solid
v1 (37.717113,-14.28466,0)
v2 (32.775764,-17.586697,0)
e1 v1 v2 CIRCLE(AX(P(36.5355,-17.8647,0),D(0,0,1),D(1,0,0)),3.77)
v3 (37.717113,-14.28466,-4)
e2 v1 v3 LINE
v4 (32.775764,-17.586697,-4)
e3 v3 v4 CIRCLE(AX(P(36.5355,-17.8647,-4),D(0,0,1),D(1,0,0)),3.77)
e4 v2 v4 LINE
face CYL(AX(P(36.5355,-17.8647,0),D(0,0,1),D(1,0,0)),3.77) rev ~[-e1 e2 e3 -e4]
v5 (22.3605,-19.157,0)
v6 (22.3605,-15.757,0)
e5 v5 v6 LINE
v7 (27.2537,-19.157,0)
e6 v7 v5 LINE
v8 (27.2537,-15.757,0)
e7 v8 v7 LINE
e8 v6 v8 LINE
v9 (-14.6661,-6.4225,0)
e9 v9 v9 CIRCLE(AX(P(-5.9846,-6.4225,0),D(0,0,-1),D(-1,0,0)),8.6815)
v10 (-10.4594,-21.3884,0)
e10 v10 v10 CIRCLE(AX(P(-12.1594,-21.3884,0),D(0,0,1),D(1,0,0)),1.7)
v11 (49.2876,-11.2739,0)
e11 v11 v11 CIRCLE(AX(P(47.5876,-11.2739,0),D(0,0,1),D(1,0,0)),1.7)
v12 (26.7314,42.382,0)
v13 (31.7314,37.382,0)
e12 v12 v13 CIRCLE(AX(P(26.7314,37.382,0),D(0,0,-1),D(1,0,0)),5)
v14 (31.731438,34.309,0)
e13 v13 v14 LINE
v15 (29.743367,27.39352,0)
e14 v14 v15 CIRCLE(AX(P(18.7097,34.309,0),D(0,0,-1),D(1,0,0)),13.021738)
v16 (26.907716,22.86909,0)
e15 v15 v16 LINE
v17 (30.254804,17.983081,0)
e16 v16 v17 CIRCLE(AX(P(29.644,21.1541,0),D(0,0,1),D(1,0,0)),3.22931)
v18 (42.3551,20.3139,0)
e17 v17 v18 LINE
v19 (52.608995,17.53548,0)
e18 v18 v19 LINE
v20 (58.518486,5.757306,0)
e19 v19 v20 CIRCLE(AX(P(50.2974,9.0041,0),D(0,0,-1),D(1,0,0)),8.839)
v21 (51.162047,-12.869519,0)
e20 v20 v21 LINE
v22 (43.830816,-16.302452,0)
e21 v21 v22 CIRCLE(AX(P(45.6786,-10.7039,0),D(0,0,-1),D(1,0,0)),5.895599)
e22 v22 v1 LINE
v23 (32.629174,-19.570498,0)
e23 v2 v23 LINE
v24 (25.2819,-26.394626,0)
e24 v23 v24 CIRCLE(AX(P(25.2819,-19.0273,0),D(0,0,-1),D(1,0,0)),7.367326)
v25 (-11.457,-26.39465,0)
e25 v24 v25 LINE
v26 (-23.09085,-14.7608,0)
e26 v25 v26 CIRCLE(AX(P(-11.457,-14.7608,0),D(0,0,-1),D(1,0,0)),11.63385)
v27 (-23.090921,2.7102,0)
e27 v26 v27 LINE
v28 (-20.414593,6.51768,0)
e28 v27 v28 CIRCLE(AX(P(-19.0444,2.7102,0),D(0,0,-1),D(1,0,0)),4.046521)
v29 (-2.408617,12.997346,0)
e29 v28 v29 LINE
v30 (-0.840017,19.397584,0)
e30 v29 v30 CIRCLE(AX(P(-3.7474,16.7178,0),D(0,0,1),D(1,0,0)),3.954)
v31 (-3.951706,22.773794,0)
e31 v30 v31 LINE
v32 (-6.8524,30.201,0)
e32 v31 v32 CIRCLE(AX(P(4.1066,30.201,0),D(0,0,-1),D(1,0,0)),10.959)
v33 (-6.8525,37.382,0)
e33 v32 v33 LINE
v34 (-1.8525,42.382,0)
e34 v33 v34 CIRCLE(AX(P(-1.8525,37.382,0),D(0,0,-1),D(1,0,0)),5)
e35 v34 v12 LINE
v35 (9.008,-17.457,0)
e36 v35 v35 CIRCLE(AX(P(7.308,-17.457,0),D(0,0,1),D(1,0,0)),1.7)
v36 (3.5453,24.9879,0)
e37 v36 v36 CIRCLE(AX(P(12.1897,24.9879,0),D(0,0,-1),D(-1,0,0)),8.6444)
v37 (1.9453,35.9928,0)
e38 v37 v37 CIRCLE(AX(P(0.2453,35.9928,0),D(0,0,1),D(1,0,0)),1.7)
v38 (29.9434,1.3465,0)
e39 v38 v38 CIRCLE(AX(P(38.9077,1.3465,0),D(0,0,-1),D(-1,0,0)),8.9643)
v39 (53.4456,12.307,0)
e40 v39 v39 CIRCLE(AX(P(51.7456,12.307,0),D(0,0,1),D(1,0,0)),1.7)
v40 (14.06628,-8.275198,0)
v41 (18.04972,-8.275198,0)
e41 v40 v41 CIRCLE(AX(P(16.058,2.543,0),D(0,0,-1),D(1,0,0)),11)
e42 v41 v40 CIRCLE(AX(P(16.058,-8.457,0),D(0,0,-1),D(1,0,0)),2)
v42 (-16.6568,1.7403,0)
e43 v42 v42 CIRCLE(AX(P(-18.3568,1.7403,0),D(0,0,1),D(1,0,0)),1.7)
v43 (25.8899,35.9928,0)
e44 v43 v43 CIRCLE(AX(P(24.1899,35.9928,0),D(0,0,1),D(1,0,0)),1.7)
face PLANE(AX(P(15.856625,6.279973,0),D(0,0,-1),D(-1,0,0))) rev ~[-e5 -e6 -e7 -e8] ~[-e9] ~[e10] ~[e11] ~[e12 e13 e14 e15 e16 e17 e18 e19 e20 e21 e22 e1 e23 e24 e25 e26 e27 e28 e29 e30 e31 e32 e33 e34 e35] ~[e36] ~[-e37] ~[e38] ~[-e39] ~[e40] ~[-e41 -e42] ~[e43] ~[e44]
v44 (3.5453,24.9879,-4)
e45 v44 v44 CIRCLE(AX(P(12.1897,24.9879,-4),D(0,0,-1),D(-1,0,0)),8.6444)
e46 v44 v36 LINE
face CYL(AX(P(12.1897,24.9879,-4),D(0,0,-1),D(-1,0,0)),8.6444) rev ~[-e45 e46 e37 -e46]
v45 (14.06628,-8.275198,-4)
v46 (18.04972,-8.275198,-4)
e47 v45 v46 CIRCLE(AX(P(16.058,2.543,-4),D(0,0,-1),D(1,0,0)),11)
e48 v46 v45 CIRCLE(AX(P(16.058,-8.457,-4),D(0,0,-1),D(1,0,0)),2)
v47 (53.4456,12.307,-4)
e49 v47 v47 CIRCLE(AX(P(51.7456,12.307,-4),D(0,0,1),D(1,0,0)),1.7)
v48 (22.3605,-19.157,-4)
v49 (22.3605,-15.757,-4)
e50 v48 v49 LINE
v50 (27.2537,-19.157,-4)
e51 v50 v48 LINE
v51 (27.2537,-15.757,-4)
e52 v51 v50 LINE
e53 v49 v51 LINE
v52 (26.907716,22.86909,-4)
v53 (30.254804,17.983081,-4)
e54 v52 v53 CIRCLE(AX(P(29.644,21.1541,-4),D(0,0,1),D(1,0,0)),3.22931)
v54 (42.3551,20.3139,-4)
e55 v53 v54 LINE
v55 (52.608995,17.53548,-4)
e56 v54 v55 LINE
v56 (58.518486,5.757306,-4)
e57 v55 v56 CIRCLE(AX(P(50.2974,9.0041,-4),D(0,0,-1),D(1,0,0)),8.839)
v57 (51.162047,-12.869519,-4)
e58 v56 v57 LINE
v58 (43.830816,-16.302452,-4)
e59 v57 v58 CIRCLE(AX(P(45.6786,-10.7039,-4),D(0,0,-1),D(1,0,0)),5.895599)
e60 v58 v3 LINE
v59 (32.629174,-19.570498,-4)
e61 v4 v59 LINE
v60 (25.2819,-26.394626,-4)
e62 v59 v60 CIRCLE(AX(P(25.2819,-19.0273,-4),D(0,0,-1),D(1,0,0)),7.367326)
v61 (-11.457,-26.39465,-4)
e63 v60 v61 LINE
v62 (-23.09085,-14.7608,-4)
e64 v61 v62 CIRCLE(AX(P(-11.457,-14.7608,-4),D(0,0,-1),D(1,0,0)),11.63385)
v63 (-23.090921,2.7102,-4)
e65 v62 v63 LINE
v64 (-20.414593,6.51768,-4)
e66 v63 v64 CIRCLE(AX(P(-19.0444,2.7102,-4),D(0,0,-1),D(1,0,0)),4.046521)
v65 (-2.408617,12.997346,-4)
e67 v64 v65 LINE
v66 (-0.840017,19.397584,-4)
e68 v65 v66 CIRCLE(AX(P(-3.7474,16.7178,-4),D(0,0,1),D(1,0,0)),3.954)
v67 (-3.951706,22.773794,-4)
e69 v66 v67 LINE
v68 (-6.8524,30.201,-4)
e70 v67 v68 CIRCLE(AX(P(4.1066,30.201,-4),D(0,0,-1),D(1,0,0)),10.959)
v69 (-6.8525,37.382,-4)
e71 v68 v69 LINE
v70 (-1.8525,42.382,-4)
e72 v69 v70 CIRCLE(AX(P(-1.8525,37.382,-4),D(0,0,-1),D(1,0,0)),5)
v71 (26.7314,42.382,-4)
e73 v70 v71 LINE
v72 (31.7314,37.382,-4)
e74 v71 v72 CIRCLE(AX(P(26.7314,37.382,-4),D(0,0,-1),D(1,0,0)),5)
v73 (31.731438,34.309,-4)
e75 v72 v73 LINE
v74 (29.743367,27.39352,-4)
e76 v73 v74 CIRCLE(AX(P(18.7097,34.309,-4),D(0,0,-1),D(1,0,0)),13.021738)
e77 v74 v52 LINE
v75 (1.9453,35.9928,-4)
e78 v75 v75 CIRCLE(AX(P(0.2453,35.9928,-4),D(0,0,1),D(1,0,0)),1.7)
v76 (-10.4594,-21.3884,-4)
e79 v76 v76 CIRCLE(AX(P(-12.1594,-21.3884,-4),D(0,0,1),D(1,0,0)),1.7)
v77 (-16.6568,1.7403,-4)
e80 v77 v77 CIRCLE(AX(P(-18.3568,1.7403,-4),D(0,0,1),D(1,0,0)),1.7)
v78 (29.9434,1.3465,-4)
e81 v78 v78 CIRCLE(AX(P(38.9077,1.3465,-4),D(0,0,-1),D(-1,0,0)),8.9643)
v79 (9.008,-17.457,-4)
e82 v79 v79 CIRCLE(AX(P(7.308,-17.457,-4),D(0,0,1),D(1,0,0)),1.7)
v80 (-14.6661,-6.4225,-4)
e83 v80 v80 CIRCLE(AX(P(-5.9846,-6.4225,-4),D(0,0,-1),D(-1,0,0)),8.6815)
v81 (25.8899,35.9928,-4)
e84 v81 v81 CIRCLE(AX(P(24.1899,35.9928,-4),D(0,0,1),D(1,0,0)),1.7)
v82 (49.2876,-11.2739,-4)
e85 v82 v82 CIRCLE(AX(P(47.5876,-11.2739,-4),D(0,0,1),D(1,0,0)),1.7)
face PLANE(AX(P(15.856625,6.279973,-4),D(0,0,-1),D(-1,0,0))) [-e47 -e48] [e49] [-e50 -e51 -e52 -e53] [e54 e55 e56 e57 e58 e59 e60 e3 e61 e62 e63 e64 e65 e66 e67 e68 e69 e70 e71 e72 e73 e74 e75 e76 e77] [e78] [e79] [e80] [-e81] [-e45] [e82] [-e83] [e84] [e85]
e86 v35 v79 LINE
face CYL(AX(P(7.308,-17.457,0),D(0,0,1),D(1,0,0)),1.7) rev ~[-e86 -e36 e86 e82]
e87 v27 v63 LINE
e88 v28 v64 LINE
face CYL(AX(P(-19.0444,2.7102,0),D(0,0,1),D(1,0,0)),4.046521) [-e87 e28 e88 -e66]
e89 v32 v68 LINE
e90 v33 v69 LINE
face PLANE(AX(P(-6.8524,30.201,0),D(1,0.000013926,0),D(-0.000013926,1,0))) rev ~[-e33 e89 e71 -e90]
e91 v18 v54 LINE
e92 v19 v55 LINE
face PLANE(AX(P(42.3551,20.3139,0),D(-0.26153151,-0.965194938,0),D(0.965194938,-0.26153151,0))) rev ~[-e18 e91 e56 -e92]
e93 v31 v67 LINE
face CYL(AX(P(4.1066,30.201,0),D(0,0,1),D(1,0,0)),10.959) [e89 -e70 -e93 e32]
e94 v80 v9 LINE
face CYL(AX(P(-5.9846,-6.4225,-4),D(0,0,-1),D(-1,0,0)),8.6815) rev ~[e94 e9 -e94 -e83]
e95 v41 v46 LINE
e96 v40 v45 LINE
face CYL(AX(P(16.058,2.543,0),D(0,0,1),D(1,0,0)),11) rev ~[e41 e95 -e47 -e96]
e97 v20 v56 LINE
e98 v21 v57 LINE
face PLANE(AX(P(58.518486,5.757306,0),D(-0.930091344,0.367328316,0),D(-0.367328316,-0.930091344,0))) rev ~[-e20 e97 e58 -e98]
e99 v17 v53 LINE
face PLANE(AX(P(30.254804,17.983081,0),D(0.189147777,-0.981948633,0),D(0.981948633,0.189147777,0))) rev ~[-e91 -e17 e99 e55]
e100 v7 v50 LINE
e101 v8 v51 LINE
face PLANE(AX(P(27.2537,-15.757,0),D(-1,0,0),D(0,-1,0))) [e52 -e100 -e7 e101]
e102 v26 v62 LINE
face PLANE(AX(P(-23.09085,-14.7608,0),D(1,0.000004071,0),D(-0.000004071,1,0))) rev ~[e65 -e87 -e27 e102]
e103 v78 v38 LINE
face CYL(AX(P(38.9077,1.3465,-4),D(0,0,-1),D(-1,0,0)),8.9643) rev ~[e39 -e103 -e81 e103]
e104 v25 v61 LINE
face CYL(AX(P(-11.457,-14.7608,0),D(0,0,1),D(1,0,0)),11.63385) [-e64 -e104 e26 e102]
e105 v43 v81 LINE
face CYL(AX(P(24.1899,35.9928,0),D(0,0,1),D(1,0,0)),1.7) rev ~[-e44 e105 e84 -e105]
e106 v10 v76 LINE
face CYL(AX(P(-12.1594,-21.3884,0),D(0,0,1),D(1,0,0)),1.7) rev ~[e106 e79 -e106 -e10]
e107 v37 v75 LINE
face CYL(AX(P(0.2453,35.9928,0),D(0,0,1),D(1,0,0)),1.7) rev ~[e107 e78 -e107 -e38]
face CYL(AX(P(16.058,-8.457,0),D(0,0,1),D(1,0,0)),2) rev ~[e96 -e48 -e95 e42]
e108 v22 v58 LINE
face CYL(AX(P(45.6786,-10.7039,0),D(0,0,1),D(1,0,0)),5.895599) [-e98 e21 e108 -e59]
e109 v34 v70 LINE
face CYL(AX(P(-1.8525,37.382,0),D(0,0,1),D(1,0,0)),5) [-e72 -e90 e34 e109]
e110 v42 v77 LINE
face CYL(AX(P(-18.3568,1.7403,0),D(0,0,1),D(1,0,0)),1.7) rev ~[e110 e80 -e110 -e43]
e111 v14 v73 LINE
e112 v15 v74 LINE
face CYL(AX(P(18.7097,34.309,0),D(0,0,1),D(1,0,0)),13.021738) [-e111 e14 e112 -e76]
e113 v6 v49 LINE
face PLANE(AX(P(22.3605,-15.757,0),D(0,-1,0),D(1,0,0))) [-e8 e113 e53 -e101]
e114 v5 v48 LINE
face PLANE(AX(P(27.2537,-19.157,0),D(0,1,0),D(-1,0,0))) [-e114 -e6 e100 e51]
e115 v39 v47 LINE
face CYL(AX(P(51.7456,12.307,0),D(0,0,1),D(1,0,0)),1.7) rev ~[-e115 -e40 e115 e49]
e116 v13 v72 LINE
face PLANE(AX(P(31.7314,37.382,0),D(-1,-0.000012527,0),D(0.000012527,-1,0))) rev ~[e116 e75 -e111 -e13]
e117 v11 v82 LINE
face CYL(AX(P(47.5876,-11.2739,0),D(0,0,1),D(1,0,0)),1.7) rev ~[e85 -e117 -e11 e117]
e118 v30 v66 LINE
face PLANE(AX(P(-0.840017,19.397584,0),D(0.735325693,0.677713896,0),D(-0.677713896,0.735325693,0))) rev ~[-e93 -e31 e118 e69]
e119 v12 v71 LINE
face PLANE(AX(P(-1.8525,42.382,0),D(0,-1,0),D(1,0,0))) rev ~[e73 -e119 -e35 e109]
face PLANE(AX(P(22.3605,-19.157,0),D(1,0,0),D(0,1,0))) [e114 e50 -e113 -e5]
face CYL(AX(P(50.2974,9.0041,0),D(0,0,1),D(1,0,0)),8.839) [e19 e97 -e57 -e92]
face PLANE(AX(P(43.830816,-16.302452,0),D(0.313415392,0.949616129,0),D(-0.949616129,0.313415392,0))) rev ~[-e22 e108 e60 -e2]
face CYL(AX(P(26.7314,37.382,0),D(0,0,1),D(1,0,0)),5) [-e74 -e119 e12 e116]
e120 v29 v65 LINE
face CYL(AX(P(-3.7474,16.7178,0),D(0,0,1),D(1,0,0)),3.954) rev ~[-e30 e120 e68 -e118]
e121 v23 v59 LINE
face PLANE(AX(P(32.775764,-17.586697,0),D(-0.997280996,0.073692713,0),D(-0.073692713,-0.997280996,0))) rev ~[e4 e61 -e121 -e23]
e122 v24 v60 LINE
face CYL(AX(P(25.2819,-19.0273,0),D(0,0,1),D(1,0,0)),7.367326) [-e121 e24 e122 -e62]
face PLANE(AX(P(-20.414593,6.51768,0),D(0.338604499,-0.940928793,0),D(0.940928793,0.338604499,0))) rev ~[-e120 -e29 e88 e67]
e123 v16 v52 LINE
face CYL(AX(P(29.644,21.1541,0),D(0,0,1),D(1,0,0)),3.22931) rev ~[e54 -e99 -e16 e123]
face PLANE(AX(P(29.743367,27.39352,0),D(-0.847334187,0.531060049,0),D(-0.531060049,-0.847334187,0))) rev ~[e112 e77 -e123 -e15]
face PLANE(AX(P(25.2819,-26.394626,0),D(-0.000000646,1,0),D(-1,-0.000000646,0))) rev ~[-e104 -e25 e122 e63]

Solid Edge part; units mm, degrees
sketch "Sketch1" plane through (0, 0, 0) normal (0, 0, 1) x (1, 0, 0)
  arc A0 (-6.8525, 37.382) -> (-1.8525, 42.382) centre (-1.8525, 37.382) cw
  line L0 (-1.8525, 42.382) -> (26.7314, 42.382)
  arc A1 (26.7314, 42.382) -> (31.7314, 37.382) centre (26.7314, 37.382) cw
  line L1 (31.7314, 37.382) -> (31.7314, 34.309)
  arc A2 (31.7314, 34.309) -> (29.7434, 27.3935) centre (18.7097, 34.309) cw
  line L2 (29.7434, 27.3935) -> (26.9077, 22.8691)
  arc A3 (26.9077, 22.8691) -> (30.2548, 17.9831) centre (29.644, 21.1541) ccw
  line L3 (30.2548, 17.9831) -> (42.3551, 20.3139)
  line L4 (42.3551, 20.3139) -> (52.609, 17.5355)
  arc A4 (52.609, 17.5355) -> (58.5185, 5.7573) centre (50.2974, 9.0041) cw
  line L5 (58.5185, 5.7573) -> (51.162, -12.8695)
  arc A5 (51.162, -12.8695) -> (43.8308, -16.3025) centre (45.6786, -10.7039) cw
  line L6 (43.8308, -16.3025) -> (37.7171, -14.2847)
  arc A6 (37.7171, -14.2847) -> (32.7758, -17.5867) centre (36.5355, -17.8647) ccw
  line L7 (32.7758, -17.5867) -> (32.6292, -19.5705)
  arc A7 (32.6292, -19.5705) -> (25.2819, -26.3946) centre (25.2819, -19.0273) cw
  line L8 (25.2819, -26.3946) -> (-11.457, -26.3946)
  arc A8 (-11.457, -26.3946) -> (-23.0909, -14.7608) centre (-11.457, -14.7608) cw
  line L9 (-23.0909, -14.7608) -> (-23.0909, 2.7102)
  arc A9 (-23.0909, 2.7102) -> (-20.4146, 6.5177) centre (-19.0444, 2.7102) cw
  line L10 (-20.4146, 6.5177) -> (-2.4086, 12.9973)
  arc A10 (-2.4086, 12.9973) -> (-0.84, 19.3976) centre (-3.7474, 16.7178) ccw
  line L11 (-0.84, 19.3976) -> (-3.9517, 22.7738)
  arc A11 (-3.9517, 22.7738) -> (-6.8525, 30.201) centre (4.1066, 30.201) cw
  line L12 (-6.8525, 30.201) -> (-6.8525, 37.382)
  circle A12 centre (7.308, -17.457) radius 1.7
  arc A13 (18.0497, -8.2752) -> (14.0663, -8.2752) centre (16.058, -8.457) cw
  arc A14 (14.0663, -8.2752) -> (18.0497, -8.2752) centre (16.058, 2.543) cw
  circle A15 centre (24.1899, 35.9928) radius 1.7
  circle A16 centre (0.2453, 35.9928) radius 1.7
  line L13 (27.2537, -19.157) -> (22.3605, -19.157)
  line L14 (27.2537, -15.757) -> (27.2537, -19.157)
  line L15 (22.3605, -15.757) -> (27.2537, -15.757)
  line L16 (22.3605, -19.157) -> (22.3605, -15.757)
  circle A17 centre (-18.3568, 1.7403) radius 1.7
  circle A18 centre (-12.1594, -21.3884) radius 1.7
  circle A19 centre (47.5876, -11.2739) radius 1.7
  circle A20 centre (51.7456, 12.307) radius 1.7
extrude "Protrusion1" add sketch "Sketch1" against normal blind 4
sketch "Sketch2" plane through (18.0228, 7.9937, -4) normal (0, 0, -1) x (-1, 0, 0)
  circle A0 centre (5.8331, 16.9942) radius 8.6444
  circle A1 centre (24.0074, -14.4162) radius 8.6815
  circle A2 centre (-20.8849, -6.6472) radius 8.9643
extrude "Cutout1" cut sketch "Sketch2" against normal up to next
